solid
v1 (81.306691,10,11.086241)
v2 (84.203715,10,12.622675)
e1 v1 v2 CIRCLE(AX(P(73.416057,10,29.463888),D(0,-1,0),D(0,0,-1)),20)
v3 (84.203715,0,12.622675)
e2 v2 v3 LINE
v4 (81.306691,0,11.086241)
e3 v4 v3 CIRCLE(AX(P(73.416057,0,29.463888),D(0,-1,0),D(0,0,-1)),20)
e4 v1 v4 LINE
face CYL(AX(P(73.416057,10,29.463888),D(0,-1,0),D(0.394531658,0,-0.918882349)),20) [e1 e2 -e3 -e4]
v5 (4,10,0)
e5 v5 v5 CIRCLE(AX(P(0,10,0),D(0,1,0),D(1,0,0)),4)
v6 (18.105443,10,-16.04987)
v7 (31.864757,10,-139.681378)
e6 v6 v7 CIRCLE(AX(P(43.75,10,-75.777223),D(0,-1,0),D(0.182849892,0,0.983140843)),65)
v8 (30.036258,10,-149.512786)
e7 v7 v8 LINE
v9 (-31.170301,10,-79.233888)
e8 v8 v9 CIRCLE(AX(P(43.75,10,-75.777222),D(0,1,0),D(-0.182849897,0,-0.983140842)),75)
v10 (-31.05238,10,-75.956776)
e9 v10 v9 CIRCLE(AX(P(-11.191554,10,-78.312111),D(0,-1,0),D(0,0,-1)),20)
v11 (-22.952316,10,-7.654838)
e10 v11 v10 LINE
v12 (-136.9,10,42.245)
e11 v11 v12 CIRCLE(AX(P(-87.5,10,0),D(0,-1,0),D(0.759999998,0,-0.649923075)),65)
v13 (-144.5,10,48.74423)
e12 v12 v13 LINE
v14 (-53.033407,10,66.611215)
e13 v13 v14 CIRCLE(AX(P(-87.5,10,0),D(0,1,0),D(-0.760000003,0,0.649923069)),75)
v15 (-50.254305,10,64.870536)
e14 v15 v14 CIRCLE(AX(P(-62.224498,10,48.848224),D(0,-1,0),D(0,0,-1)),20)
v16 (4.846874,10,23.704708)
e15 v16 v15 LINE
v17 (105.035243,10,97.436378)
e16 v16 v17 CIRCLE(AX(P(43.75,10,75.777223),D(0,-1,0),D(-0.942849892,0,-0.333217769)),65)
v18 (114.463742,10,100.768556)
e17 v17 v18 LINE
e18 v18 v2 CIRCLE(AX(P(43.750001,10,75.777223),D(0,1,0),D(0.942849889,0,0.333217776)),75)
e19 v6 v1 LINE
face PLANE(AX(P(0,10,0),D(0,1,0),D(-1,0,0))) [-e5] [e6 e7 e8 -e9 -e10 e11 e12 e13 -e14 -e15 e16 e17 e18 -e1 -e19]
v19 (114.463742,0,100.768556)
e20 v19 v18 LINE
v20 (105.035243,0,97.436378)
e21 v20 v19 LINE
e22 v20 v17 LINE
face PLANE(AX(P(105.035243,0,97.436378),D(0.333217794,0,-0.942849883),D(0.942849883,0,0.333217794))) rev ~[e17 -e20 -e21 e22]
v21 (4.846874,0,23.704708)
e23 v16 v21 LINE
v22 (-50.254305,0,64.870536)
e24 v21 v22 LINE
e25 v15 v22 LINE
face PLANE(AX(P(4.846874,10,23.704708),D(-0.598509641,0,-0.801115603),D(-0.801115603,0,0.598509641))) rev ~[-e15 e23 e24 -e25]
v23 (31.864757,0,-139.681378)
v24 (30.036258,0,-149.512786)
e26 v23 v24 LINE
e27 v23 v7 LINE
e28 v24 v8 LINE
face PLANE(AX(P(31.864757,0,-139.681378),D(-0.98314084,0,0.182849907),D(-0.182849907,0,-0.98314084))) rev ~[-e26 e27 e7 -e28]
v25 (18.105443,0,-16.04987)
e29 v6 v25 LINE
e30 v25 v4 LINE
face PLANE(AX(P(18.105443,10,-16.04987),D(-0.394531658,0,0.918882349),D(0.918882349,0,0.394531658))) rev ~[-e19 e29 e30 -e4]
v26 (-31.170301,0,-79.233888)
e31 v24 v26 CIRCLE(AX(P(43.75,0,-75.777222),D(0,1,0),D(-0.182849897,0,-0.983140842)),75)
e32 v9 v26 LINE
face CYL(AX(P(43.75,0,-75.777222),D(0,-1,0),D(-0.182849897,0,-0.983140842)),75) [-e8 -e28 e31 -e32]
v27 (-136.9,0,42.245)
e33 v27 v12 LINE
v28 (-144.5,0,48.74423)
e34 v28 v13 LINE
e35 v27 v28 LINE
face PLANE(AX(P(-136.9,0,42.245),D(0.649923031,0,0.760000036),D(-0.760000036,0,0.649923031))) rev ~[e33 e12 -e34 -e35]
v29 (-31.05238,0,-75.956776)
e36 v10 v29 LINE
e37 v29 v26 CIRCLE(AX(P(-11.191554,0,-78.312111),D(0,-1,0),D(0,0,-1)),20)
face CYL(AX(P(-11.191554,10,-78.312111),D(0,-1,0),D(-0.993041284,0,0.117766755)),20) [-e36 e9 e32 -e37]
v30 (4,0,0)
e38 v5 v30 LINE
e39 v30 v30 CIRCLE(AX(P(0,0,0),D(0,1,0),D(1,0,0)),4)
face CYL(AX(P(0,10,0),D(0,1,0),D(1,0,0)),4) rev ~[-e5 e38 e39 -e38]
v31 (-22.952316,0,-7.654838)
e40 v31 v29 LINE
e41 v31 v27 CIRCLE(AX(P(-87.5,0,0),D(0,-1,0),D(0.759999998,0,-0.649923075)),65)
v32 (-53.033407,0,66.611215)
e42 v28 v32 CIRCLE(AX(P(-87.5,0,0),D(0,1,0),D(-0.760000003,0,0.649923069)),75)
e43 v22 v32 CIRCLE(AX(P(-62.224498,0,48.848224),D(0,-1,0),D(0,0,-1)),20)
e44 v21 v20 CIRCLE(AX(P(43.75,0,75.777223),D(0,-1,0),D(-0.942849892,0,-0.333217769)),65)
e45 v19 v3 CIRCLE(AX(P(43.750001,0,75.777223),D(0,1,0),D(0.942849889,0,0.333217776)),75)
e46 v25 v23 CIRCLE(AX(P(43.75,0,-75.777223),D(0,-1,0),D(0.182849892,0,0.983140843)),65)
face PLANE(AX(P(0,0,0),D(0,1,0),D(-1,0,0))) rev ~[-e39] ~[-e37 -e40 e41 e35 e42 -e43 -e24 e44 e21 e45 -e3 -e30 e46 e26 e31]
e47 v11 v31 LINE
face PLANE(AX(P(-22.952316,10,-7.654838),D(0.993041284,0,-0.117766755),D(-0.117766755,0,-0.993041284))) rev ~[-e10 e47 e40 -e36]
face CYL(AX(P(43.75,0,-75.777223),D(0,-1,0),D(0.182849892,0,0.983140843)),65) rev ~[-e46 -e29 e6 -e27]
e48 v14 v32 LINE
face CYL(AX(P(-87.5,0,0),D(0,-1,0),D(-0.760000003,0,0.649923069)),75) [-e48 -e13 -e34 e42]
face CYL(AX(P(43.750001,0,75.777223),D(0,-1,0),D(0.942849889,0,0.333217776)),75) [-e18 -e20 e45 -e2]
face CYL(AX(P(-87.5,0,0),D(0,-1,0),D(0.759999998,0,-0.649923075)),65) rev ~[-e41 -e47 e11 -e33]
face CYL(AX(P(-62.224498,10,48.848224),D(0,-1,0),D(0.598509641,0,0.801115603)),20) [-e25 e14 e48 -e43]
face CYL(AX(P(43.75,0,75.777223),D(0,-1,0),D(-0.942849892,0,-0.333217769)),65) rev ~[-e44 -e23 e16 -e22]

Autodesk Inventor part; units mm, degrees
ref_plane "YZ Plane" through (0, 0, 0) normal (1, 0, 0) x (0, 1, 0)
ref_plane "XZ Plane" through (0, 0, 0) normal (0, 1, 0) x (-1, 0, 0)
ref_plane "XY Plane" through (0, 0, 0) normal (0, 0, 1) x (1, 0, 0)
sketch "Эскиз1" plane through (0, 0, 0) normal (0, 1, 0) x (-1, 0, 0)
  circle A0 centre (0, 0) radius 152.5
  line L0 (0, 0) -> (152.5, 0)
  circle A1 centre (87.5, 0) radius 65
  circle A2 centre (-43.75, 75.777223) radius 65
  circle A3 centre (-43.75, -75.777223) radius 65
  circle A4 centre (87.5, 0) radius 75
  circle A5 centre (-43.75, 75.777223) radius 75
  circle A6 centre (-43.75, -75.777223) radius 75
  line L1 (0, 0) -> (-76.25, 132.068874)
  line L2 (0, 0) -> (-76.25, -132.068874)
  line L3 (144.5, 48.74423) -> (30.5, -48.74423)
  line L4 (-114.463742, 100.768556) -> (26.963742, 50.78589)
  line L5 (-30.036258, -149.512786) -> (-57.463742, -2.04166)
  line L6 (30.5, -48.74423) -> (26.963742, -50.78589)
  line L7 (26.963742, 50.78589) -> (30.5, 48.74423)
  line L8 (-57.463742, -2.04166) -> (-57.463742, 2.04166)
  point P0 (14.069297, 24.368737)
  point P1 (-28.138593, 0)
  point P2 (14.069297, -24.368737)
  point P3 (12.5, 0)
  point P4 (22.5, 0)
  point P5 (152.5, 0)
  point P6 (-6.25, 10.825318)
  point P7 (-11.25, 19.485572)
  point P8 (-76.25, 132.068874)
  point P9 (-114.463742, 100.768556)
  point P10 (-6.25, -10.825318)
  point P11 (-11.25, -19.485572)
  point P12 (-76.25, -132.068874)
  point P13 (-30.036258, -149.512786)
  point P14 (-114.463742, -100.768556)
  point P15 (-30.036258, 149.512786)
  point P16 (144.5, -48.74423)
  point P17 (152.5, 0)
  point P18 (136.9, 42.245)
  point P19 (17.535243, 54.118068)
  point P20 (-105.035243, 97.436378)
  point P21 (-114.463742, 100.768556)
  point P22 (-57.463742, -2.04166)
  point P23 (-55.635243, -11.873068)
  point P24 (-31.864757, -139.681378)
  point P25 (-30.036258, -149.512786)
  point P26 (38.1, -42.245)
  dimension "d0" = 305
  dimension "d1" = 130
  dimension "d2" = 0
  dimension "d5" = 360
  dimension "d7" = 150
  dimension "d10" = 360
  dimension "d16" = 360
  dimension "d18" = 0
  dimension "d21" = 360
  dimension "d25" = 360
sketch "Эскиз1 outline for Выдавливание1" plane through (0, 0, 0) normal (0, 1, 0) x (-1, 0, 0)
  line L0 (136.9, 42.245) -> (144.5, 48.74423)
  arc A0 (38.1, -42.245) -> (136.9, 42.245) centre (87.5, 0) cw
  line L1 (30.5, -48.74423) -> (38.1, -42.245)
  line L2 (26.963742, -50.78589) -> (30.5, -48.74423)
  arc A1 (-30.036258, -149.512786) -> (26.963742, -50.78589) centre (-43.75, -75.777223) ccw
  line L3 (-31.864757, -139.681378) -> (-30.036258, -149.512786)
  arc A2 (-55.635243, -11.873068) -> (-31.864757, -139.681378) centre (-43.75, -75.777223) cw
  line L4 (-57.463742, -2.04166) -> (-55.635243, -11.873068)
  line L5 (-57.463742, 2.04166) -> (-57.463742, -2.04166)
  arc A3 (-114.463742, 100.768556) -> (-57.463742, 2.04166) centre (-43.75, 75.777223) ccw
  line L6 (-105.035243, 97.436378) -> (-114.463742, 100.768556)
  arc A4 (17.535243, 54.118068) -> (-105.035243, 97.436378) centre (-43.75, 75.777223) cw
  line L7 (26.963742, 50.78589) -> (17.535243, 54.118068)
  line L8 (30.5, 48.74423) -> (26.963742, 50.78589)
  arc A5 (144.5, 48.74423) -> (30.5, 48.74423) centre (87.5, 0) ccw
extrude "Выдавливание1" add sketch "Эскиз1 outline for Выдавливание1" along normal blind 10
chamfer "Фаска1" distance 10 angle 45 3 edges at (55.6352, 5, -11.8731) (-17.5352, 5, 54.1181) (-38.1, 5, -42.245)
sketch "Эскиз2" plane through (0, 10, 0) normal (0, 1, 0) x (1, 0, 0)
  line L0 (-32.204642, 34.167577) -> (-30.5, 48.74423)
  line L1 (-32.204642, 34.167577) -> (-31.020127, 86.842802)
  arc A0 (30.036258, 149.512786) -> (-26.963742, 50.78589) centre (43.75, 75.777223) ccw
  line L2 (-13.487669, -44.973827) -> (-59.698009, -70.285619)
  line L3 (45.692311, 10.806249) -> (90.718136, -16.557183)
  line L4 (-32.204642, 34.167577) -> (-30.5, 48.74423)
  arc A1 (-136.9, -42.245) -> (-32.204642, 34.167577) centre (-87.5, 0) ccw
  line L5 (-136.9, -42.245) -> (-144.5, -48.74423)
  arc A2 (-144.5, -48.74423) -> (-30.5, -48.74423) centre (-87.5, 0) ccw
  line L6 (-30.5, -48.74423) -> (-26.963742, -50.78589)
  line L7 (-13.487669, -44.973827) -> (-26.963742, -50.78589)
  arc A3 (105.035243, -97.436378) -> (-13.487669, -44.973827) centre (43.75, -75.777223) ccw
  line L8 (105.035243, -97.436378) -> (114.463742, -100.768556)
  arc A4 (114.463742, -100.768556) -> (57.463742, -2.04166) centre (43.75, -75.777223) ccw
  line L9 (57.463742, -2.04166) -> (57.463742, 2.04166)
  line L10 (45.692311, 10.806249) -> (57.463742, 2.04166)
  arc A5 (31.864757, 139.681378) -> (45.692311, 10.806249) centre (43.75, 75.777223) ccw
  line L11 (31.864757, 139.681378) -> (30.036258, 149.512786)
  arc A6 (30.036258, 149.512786) -> (-26.963742, 50.78589) centre (43.75, 75.777223) ccw
  line L12 (-26.963742, 50.78589) -> (-30.5, 48.74423)
  point P0 (0, 0)
  point P1 (82.700735, -11.684788)
  point P2 (-51.46969, -65.778544)
  point P3 (-31.231045, 77.463331)
  dimension "d32" = 360
sketch "Эскиз2 outline for Выдавливание2" plane through (0, 10, 0) normal (0, 1, 0) x (1, 0, 0)
  line L0 (57.463742, 2.04166) -> (57.463742, -2.04166)
  line L1 (45.692311, 10.806249) -> (57.463742, 2.04166)
  line L2 (82.700735, -11.684788) -> (45.692311, 10.806249)
  arc A0 (57.463742, -2.04166) -> (82.700735, -11.684788) centre (43.75, -75.777223) cw
  line L3 (-26.963742, -50.78589) -> (-30.5, -48.74423)
  line L4 (-13.487669, -44.973827) -> (-26.963742, -50.78589)
  line L5 (-51.46969, -65.778544) -> (-13.487669, -44.973827)
  arc A1 (-30.5, -48.74423) -> (-51.46969, -65.778544) centre (-87.5, 0) cw
  line L6 (-30.5, 48.74423) -> (-26.963742, 50.78589)
  line L7 (-32.204642, 34.167577) -> (-30.5, 48.74423)
  line L8 (-31.231045, 77.463331) -> (-32.204642, 34.167577)
  arc A2 (-26.963742, 50.78589) -> (-31.231045, 77.463331) centre (43.75, 75.777223) cw
extrude "Выдавливание2" add sketch "Эскиз2 outline for Выдавливание2" against normal blind 10
sketch "Эскиз3" plane through (0, 10, 0) normal (0, 1, 0) x (1, 0, 0)
  arc A0 (-136.9, -42.245) -> (-32.204642, 34.167577) centre (-87.5, 0) ccw
  line L0 (-136.9, -42.245) -> (-144.5, -48.74423)
  arc A1 (-144.5, -48.74423) -> (-51.46969, -65.778544) centre (-87.5, 0) ccw
  line L1 (-51.46969, -65.778544) -> (-13.487669, -44.973827)
  arc A2 (105.035243, -97.436378) -> (-13.487669, -44.973827) centre (43.75, -75.777223) ccw
  line L2 (105.035243, -97.436378) -> (114.463742, -100.768556)
  arc A3 (114.463742, -100.768556) -> (82.700735, -11.684788) centre (43.75, -75.777223) ccw
  line L3 (82.700735, -11.684788) -> (45.692311, 10.806249)
  arc A4 (31.864757, 139.681378) -> (45.692311, 10.806249) centre (43.75, 75.777223) ccw
  line L4 (31.864757, 139.681378) -> (30.036258, 149.512786)
  arc A5 (30.036258, 149.512786) -> (-31.231045, 77.463331) centre (43.75, 75.777223) ccw
  line L5 (-31.231045, 77.463331) -> (-32.204642, 34.167577)
  line L6 (-31.231045, 77.463331) -> (-15.37541, -56.235706)
  line L7 (-51.46969, -65.778544) -> (56.389255, 14.802358)
  line L8 (82.700735, -11.684788) -> (-41.013845, 41.433348)
  point P0 (0, 0)
  point P1 (4.846874, -23.704708)
  point P2 (18.105443, 16.04987)
  point P3 (-22.952316, 7.654838)
  dimension "d38" = 360
sketch "Эскиз3 outline for Выдавливание3" plane through (0, 10, 0) normal (0, 1, 0) x (1, 0, 0)
  line L0 (4.846874, -23.704708) -> (-51.46969, -65.778544)
  arc A0 (-13.487669, -44.973827) -> (4.846874, -23.704708) centre (43.75, -75.777223) cw
  line L1 (-51.46969, -65.778544) -> (-13.487669, -44.973827)
  line L2 (18.105443, 16.04987) -> (82.700735, -11.684788)
  arc A1 (45.692311, 10.806249) -> (18.105443, 16.04987) centre (43.75, 75.777223) cw
  line L3 (82.700735, -11.684788) -> (45.692311, 10.806249)
  line L4 (-22.952316, 7.654838) -> (-31.231045, 77.463331)
  arc A2 (-32.204642, 34.167577) -> (-22.952316, 7.654838) centre (-87.5, 0) cw
  line L5 (-31.231045, 77.463331) -> (-32.204642, 34.167577)
extrude "Выдавливание3" cut sketch "Эскиз3 outline for Выдавливание3" against normal through all
fillet "Сопряжение1" radius 20 3 edges at (82.7007, 5, 11.6848) (-51.4697, 5, 65.7785) (-31.231, 5, -77.4633)
sketch "Эскиз4" plane through (0, 10, 0) normal (0, 1, 0) x (1, 0, 0)
  circle A0 centre (0, 0) radius 4
  dimension "d43" = 8
sketch "Эскиз4 outline for Выдавливание4" plane through (0, 10, 0) normal (0, 1, 0) x (1, 0, 0)
  circle A0 centre (0, 0) radius 4
extrude "Выдавливание4" cut sketch "Эскиз4 outline for Выдавливание4" against normal blind 140
properties part number "сюрикен"
